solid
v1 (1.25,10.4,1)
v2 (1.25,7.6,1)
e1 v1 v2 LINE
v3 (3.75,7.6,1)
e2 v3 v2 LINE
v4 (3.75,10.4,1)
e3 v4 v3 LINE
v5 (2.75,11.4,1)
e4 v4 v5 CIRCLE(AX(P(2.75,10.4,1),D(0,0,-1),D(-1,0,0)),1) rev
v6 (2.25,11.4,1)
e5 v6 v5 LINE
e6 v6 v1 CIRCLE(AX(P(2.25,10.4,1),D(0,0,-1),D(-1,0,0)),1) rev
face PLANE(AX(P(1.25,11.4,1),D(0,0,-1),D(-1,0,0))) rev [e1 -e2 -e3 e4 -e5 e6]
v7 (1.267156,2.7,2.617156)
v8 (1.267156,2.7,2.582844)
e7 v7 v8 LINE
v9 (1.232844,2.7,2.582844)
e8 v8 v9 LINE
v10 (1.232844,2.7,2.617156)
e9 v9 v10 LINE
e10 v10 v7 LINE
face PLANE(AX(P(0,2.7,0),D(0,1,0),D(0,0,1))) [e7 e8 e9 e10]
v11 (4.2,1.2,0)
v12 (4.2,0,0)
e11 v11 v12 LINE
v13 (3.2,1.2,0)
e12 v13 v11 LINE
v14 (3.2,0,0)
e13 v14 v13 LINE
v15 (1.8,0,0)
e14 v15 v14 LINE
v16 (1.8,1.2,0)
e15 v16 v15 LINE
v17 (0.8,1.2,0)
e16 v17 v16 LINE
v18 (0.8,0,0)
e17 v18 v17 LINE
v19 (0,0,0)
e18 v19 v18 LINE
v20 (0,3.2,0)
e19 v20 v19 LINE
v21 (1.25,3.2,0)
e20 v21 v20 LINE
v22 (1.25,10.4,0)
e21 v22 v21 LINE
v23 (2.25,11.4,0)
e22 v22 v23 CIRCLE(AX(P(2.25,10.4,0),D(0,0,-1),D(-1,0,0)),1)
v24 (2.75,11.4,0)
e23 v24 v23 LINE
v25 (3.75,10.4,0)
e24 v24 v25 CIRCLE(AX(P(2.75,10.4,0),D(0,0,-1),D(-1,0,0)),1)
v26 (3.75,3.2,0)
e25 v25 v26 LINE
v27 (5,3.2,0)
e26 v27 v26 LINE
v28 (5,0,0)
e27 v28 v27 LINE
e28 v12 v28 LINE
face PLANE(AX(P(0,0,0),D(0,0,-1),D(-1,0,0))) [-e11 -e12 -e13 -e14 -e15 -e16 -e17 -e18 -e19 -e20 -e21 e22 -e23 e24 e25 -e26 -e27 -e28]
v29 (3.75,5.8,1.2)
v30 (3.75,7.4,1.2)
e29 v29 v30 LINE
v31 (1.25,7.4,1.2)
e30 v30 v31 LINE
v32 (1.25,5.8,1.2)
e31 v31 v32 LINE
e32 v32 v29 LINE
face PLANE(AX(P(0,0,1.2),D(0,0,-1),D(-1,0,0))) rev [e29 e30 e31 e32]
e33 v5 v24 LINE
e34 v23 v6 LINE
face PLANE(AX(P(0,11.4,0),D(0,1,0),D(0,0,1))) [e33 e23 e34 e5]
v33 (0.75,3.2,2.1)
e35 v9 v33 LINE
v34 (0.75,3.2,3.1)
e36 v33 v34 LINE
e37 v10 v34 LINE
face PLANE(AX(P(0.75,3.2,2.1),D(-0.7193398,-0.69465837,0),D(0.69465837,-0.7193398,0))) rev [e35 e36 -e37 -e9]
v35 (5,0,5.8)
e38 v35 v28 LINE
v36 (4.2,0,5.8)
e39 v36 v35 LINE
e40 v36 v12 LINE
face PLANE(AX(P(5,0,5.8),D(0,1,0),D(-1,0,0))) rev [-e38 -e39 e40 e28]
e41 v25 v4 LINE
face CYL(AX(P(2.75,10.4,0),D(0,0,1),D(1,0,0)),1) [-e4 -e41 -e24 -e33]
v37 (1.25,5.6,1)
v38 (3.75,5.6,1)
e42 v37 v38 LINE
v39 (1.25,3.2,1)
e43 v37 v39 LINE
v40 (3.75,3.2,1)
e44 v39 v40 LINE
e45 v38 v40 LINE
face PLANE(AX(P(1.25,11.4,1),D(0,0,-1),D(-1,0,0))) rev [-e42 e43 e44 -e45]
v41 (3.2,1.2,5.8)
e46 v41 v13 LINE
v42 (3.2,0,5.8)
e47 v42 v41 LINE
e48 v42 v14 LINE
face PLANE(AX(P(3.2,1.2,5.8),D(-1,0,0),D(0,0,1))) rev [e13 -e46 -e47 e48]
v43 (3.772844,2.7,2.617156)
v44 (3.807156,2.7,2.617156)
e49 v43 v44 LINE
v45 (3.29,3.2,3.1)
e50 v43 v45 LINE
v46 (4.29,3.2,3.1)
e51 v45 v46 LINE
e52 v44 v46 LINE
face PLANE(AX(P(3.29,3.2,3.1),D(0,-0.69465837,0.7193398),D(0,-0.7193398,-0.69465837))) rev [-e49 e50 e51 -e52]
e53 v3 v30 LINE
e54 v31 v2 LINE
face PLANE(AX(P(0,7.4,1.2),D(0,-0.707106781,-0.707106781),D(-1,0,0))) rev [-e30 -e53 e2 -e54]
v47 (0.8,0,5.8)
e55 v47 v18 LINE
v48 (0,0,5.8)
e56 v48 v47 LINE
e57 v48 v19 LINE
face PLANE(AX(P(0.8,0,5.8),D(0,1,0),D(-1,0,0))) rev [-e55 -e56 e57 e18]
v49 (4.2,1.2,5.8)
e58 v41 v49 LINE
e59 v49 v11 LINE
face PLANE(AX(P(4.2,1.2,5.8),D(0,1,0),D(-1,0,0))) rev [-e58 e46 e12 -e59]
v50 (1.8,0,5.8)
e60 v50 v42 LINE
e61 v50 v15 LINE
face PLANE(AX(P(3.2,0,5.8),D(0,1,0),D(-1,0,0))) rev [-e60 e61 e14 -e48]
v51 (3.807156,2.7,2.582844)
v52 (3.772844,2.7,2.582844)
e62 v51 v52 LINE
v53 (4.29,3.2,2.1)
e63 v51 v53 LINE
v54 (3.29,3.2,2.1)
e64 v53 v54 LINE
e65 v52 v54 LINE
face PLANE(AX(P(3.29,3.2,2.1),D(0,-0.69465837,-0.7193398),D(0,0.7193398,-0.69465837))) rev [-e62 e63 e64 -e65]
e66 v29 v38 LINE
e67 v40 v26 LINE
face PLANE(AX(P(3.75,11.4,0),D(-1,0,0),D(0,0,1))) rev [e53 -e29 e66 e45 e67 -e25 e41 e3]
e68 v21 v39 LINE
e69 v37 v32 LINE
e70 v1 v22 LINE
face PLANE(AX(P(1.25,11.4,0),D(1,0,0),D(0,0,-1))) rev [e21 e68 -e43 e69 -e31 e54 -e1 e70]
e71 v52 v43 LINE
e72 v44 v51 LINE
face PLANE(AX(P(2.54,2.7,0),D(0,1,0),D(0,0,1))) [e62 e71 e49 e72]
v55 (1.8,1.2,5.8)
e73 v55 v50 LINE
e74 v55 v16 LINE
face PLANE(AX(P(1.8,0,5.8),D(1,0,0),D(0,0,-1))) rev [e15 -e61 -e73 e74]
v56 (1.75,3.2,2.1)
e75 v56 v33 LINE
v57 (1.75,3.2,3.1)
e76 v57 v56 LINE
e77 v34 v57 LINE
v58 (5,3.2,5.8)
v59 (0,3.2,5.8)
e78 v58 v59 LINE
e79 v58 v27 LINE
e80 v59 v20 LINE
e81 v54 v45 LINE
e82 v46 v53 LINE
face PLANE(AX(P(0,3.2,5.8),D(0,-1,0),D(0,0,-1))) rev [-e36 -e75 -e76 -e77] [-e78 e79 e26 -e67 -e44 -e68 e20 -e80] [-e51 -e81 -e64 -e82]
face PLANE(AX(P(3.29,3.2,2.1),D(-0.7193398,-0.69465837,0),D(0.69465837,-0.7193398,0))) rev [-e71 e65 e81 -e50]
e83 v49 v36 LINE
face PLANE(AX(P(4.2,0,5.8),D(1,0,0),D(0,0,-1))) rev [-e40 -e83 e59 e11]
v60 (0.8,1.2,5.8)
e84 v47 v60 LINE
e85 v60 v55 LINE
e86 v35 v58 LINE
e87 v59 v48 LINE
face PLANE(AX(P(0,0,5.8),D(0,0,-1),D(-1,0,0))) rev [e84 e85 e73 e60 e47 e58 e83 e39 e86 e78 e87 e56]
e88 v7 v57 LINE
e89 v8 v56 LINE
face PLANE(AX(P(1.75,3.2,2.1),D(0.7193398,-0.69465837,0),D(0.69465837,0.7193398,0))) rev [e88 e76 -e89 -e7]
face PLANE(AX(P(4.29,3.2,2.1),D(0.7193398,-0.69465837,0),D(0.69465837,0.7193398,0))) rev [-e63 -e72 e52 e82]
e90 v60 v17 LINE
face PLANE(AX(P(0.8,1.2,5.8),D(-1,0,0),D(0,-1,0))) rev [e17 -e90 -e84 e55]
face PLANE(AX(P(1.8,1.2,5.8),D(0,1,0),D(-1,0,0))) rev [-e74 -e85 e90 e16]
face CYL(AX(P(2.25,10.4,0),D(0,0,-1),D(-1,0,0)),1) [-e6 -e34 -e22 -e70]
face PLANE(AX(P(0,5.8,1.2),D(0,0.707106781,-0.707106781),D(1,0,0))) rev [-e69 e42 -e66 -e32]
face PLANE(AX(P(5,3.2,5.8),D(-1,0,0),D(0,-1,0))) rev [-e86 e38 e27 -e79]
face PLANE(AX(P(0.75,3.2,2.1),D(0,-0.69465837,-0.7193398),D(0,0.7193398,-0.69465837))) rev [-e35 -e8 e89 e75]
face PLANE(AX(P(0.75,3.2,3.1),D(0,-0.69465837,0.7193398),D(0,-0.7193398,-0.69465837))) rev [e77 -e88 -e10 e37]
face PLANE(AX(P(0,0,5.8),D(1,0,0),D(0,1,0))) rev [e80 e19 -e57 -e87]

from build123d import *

# Parameters (mm, degrees)
EXTRUDE_1_DEPTH                  = 5.8
SKETCH_2_W                       = 2.5
SKETCH_2_H                       = 1
EXTRUDE_2_DEPTH                  = 8.2
SKETCH_3_W                       = 2.5
SKETCH_3_H                       = 2
EXTRUDE_3_DEPTH                  = 0.2
CHAMFER_1_SIZE                   = 0.2
FILLET_1_R                       = 1
SKETCH_4_W                       = 1
SKETCH_4_H                       = 1
CUT_EXTRUDE_1_DEPTH              = 0.5
CUT_EXTRUDE_1_DRAFT              = -44
PATTERN_LINEAR_1_COPY_1_SKETCH_W = 1
PATTERN_LINEAR_1_COPY_1_SKETCH_H = 1
PATTERN_LINEAR_1_COPY_1_DEPTH    = 0.5
PATTERN_LINEAR_1_COPY_1_DRAFT    = -44


with BuildPart() as part:
    # Эскиз1 → Бобышка-Вытянуть1 (new body)
    with BuildSketch(Plane.XY):
        Polygon((0, 0), (0, 3.2), (5, 3.2), (5, 0), (4.2, 0), (4.2, 1.2), (3.2, 1.2), (3.2, 0), (1.8, 0), (1.8, 1.2), (0.8, 1.2), (0.8, 0), align=None)
    extrude(amount=EXTRUDE_1_DEPTH)

    # Эскиз2 → Бобышка-Вытянуть2 (add)
    with BuildSketch(Plane(origin=(0, 3.2, 0), x_dir=(1, 0, 0), z_dir=(0, 1, 0))):
        with Locations((2.5, -0.5)):
            Rectangle(SKETCH_2_W, SKETCH_2_H)
    extrude(amount=EXTRUDE_2_DEPTH)

    # Эскиз3 → Бобышка-Вытянуть3 (add)
    with BuildSketch(Plane.XY.offset(1)):
        with Locations((2.5, 6.6)):
            Rectangle(SKETCH_3_W, SKETCH_3_H)
    extrude(amount=EXTRUDE_3_DEPTH)

    # Фаска1
    chamfer_1_edges = [part.edges().sort_by_distance(p)[0] for p in [
        (2.5, 5.6, 1.2),
        (2.5, 7.6, 1.2),
    ]]
    chamfer(chamfer_1_edges, length=CHAMFER_1_SIZE - 0.0001)  # a hair under: the kernel refuses the full size

    # Скругление1
    fillet_1_edges = [part.edges().sort_by_distance(p)[0] for p in [
        (1.25, 11.4, 0.5),
        (3.75, 11.4, 0.5),
    ]]
    fillet(fillet_1_edges, radius=FILLET_1_R)


with BuildPart() as cut_extrude_1_tool:
    # Эскиз4 → Вырез-Вытянуть1 (with draft: the straight prism first)
    with BuildSketch(Plane(origin=(0, 3.2, 0), x_dir=(1, 0, 0), z_dir=(0, 1, 0))):
        with Locations((1.25, -2.6)):
            Rectangle(SKETCH_4_W, SKETCH_4_H)
    extrude(amount=-CUT_EXTRUDE_1_DEPTH)
    # Вырез-Вытянуть1: the draft: its side faces are tilted about the plane it starts from
    cut_extrude_1_sides = [cut_extrude_1_tool.faces().sort_by_distance(p)[0] for p in [
        (0.75, 2.95, 2.6),
        (1.25, 2.95, 3.1),
        (1.75, 2.95, 2.6),
        (1.25, 2.95, 2.1),
    ]]
    draft(cut_extrude_1_sides, Plane(origin=(0, 3.2, 0), x_dir=(1, 0, 0), z_dir=(0, 1, 0)), CUT_EXTRUDE_1_DRAFT)


with BuildPart() as part_1:
    add(part.part)

    # Вырез-Вытянуть1: cut by cut_extrude_1_tool
    add(cut_extrude_1_tool.part, mode=Mode.SUBTRACT)


with BuildPart() as pattern_linear_1_copy_1_tool:
    # Линейный массив1 copy 1 sketch → Линейный массив1 copy 1 (with draft: the straight prism first)
    with BuildSketch(Plane(origin=(2.54, 3.2, 0), x_dir=(1, 0, 0), z_dir=(0, 1, 0))):
        with Locations((1.25, -2.6)):
            Rectangle(PATTERN_LINEAR_1_COPY_1_SKETCH_W, PATTERN_LINEAR_1_COPY_1_SKETCH_H)
    extrude(amount=-PATTERN_LINEAR_1_COPY_1_DEPTH)
    # Линейный массив1 copy 1: the draft: its side faces are tilted about the plane it starts from
    pattern_linear_1_copy_1_sides = [pattern_linear_1_copy_1_tool.faces().sort_by_distance(p)[0] for p in [
        (3.29, 2.95, 2.6),
        (3.79, 2.95, 3.1),
        (4.29, 2.95, 2.6),
        (3.79, 2.95, 2.1),
    ]]
    draft(pattern_linear_1_copy_1_sides, Plane(origin=(2.54, 3.2, 0), x_dir=(1, 0, 0), z_dir=(0, 1, 0)), PATTERN_LINEAR_1_COPY_1_DRAFT)


with BuildPart() as part_2:
    add(part_1.part)

    # Линейный массив1 copy 1: cut by pattern_linear_1_copy_1_tool
    add(pattern_linear_1_copy_1_tool.part, mode=Mode.SUBTRACT)


solid = part_2.part
